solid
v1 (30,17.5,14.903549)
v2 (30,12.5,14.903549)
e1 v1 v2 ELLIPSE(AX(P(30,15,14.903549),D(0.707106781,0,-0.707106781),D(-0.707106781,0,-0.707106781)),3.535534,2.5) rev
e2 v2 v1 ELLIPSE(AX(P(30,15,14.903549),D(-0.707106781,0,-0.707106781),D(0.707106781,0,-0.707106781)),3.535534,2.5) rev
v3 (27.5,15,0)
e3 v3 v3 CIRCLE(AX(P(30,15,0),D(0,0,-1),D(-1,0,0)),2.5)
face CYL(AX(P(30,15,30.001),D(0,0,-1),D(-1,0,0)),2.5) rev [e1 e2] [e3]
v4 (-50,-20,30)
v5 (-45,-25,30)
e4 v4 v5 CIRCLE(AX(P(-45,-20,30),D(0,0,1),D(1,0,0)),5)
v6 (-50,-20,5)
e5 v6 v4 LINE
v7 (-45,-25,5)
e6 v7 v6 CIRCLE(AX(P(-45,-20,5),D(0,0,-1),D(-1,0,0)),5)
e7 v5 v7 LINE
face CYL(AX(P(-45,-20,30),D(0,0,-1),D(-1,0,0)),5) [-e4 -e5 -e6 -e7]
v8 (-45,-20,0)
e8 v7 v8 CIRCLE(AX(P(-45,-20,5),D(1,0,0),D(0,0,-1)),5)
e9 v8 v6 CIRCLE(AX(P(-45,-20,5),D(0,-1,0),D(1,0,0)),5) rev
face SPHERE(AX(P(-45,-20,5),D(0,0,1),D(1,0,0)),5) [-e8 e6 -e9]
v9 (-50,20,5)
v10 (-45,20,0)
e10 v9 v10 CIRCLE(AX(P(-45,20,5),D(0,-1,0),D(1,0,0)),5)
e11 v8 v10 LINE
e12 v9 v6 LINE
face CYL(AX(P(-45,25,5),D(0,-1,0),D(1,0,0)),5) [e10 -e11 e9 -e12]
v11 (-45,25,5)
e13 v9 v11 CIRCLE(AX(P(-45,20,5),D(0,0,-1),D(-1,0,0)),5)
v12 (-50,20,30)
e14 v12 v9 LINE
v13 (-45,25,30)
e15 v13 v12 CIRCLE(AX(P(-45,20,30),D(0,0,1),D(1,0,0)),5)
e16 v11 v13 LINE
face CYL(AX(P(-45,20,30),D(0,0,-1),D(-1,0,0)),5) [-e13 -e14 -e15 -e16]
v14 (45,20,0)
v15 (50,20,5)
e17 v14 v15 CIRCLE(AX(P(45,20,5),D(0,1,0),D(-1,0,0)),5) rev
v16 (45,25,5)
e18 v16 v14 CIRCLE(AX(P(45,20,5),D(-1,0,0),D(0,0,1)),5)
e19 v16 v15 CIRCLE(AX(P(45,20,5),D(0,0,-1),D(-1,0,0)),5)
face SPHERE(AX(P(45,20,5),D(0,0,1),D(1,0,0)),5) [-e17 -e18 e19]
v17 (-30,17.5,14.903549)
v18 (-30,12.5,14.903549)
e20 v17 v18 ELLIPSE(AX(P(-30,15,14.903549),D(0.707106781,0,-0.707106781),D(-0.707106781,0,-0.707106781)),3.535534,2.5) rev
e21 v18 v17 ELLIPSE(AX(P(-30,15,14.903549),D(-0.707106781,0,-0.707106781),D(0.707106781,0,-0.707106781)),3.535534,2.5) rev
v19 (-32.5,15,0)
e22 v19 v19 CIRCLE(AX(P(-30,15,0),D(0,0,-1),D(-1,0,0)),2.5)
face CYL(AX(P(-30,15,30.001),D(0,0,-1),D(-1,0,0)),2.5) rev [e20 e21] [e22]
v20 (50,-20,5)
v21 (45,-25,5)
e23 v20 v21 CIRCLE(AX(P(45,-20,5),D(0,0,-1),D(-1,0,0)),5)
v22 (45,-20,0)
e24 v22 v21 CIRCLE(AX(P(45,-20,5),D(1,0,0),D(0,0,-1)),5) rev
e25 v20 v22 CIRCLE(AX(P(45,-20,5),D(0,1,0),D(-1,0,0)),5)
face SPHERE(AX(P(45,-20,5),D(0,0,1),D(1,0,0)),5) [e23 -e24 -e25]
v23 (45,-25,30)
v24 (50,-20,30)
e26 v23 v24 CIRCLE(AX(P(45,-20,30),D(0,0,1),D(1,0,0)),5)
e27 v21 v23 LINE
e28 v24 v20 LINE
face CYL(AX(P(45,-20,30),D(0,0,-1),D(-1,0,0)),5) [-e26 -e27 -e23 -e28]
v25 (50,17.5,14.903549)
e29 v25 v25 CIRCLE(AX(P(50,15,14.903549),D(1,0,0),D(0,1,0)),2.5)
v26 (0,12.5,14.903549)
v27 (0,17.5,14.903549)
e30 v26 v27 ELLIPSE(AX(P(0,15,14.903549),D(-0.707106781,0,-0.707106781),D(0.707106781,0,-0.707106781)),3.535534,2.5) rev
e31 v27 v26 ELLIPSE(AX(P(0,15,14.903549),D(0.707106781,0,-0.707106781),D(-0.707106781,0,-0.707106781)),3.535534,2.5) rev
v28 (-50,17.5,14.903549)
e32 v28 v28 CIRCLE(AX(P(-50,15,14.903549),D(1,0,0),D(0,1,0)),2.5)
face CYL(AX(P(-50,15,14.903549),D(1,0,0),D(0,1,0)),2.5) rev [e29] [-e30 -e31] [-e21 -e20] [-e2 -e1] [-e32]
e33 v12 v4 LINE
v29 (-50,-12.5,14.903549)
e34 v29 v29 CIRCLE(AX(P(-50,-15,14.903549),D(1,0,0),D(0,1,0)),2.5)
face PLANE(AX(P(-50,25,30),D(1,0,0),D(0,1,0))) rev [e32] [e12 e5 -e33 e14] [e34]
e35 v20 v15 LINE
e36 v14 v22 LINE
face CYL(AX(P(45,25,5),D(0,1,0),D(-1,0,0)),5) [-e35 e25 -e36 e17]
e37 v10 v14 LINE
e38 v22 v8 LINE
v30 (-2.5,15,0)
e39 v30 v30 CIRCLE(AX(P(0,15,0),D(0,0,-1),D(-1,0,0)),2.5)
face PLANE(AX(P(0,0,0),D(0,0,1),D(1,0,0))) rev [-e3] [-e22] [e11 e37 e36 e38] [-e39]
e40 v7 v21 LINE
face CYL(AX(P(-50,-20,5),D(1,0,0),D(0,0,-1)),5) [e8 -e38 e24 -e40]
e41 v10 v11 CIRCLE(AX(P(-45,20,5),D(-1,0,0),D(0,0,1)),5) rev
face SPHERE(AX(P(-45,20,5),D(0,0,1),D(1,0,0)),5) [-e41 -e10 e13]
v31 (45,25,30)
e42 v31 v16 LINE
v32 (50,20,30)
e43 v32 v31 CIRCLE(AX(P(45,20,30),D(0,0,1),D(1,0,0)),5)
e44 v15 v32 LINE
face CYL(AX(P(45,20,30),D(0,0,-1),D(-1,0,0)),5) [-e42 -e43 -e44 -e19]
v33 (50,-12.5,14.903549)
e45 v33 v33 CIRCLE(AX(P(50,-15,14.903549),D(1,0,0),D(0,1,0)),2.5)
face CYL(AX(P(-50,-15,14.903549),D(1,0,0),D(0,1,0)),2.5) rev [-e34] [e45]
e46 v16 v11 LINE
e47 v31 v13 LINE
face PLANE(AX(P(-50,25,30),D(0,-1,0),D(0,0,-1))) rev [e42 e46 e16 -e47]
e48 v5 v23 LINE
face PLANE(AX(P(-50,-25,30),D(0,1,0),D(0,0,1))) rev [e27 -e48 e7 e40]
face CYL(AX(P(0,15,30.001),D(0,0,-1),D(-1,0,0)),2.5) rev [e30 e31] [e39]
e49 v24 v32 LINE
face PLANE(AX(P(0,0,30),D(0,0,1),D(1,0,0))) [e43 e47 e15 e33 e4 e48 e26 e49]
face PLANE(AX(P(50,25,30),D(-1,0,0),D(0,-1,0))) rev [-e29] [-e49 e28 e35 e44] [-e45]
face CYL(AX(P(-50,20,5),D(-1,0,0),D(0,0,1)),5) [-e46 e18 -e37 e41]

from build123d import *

# Parameters (mm, degrees)
SKETCH1_W               = 100
SKETCH1_H               = 50
BOSS_EXTRUDE1_DEPTH     = 30
SKETCH2_R               = 2.5
CUT_EXTRUDE1_DEPTH      = 108.354552768
FILLET1_R               = 5
CUT_EXTRUDE2_REACH      = 65.443
CUT_EXTRUDE2_END_RADIUS = 2.5
SKETCH3_R               = 2.5
FILLET2_R               = 5


with BuildPart() as part:
    # Sketch1 → Boss-Extrude1 (new body)
    with BuildSketch(Plane.XY):
        Rectangle(SKETCH1_W, SKETCH1_H)
    extrude(amount=BOSS_EXTRUDE1_DEPTH)

    # Sketch2 → Cut-Extrude1 (cut, through all)
    with BuildSketch(Plane(origin=(50, 0, 0), x_dir=(0, 0, -1), z_dir=(1, 0, 0))):
        with Locations(Location((-14.903548917, 15, 0), (0, 0, 90))):
            Circle(SKETCH2_R)
        with Locations(Location((-14.903548917, -15, 0), (0, 0, 90))):
            Circle(SKETCH2_R)
    extrude(amount=-CUT_EXTRUDE1_DEPTH, mode=Mode.SUBTRACT)

    # Fillet1
    fillet1_edges = [part.edges().sort_by_distance(p)[0] for p in [
        (0, -25, 0),
        (-50, 0, 0),
        (0, 25, 0),
        (50, 0, 0),
    ]]
    fillet(fillet1_edges, radius=FILLET1_R)

    # Cut-Extrude2: up to this cylinder (the profile starts outside it)
    cut_extrude2_end = Plane(origin=(0, 15, 14.903548917), z_dir=(1, 0, 0)) * Cylinder(CUT_EXTRUDE2_END_RADIUS, 196.886, mode=Mode.PRIVATE)
    # Sketch3 → Cut-Extrude2 (cut, up to the surface)
    with BuildSketch(Plane(origin=(0, 0, 0), x_dir=(-1, 0, 0), z_dir=(0, 0, -1)), mode=Mode.PRIVATE) as cut_extrude2_sk1:
        with Locations((-30, 15)):
            Circle(SKETCH3_R)
    cut_extrude2_tool1 = extrude(cut_extrude2_sk1.sketch, amount=-CUT_EXTRUDE2_REACH, mode=Mode.PRIVATE) - cut_extrude2_end
    add(cut_extrude2_tool1.solids().sort_by_distance((30, 15, 0))[0], mode=Mode.SUBTRACT)
    # Sketch3 → Cut-Extrude2 (cut, up to the surface)
    with BuildSketch(Plane(origin=(0, 0, 0), x_dir=(-1, 0, 0), z_dir=(0, 0, -1)), mode=Mode.PRIVATE) as cut_extrude2_sk2:
        with Locations((30, 15)):
            Circle(SKETCH3_R)
    cut_extrude2_tool2 = extrude(cut_extrude2_sk2.sketch, amount=-CUT_EXTRUDE2_REACH, mode=Mode.PRIVATE) - cut_extrude2_end
    add(cut_extrude2_tool2.solids().sort_by_distance((-30, 15, 0))[0], mode=Mode.SUBTRACT)
    # Sketch3 → Cut-Extrude2 (cut, up to the surface)
    with BuildSketch(Plane(origin=(0, 0, 0), x_dir=(-1, 0, 0), z_dir=(0, 0, -1)), mode=Mode.PRIVATE) as cut_extrude2_sk3:
        with Locations((0, 15)):
            Circle(SKETCH3_R)
    cut_extrude2_tool3 = extrude(cut_extrude2_sk3.sketch, amount=-CUT_EXTRUDE2_REACH, mode=Mode.PRIVATE) - cut_extrude2_end
    add(cut_extrude2_tool3.solids().sort_by_distance((0, 15, 0))[0], mode=Mode.SUBTRACT)

    # Fillet2
    # the kernel refuses this fillet: 5 mm, written as the material it takes off along each edge
    with BuildSketch(Plane(origin=(-45, -20, 5), x_dir=(0, -1, 0), z_dir=(-1, 0, 0))) as fillet2_piece_1_section:
        Polygon((0, 0), (FILLET2_R, 0), (FILLET2_R, -FILLET2_R), (0, -FILLET2_R), align=None)
    fillet2_piece_1 = extrude(amount=FILLET2_R, mode=Mode.PRIVATE)
    fillet2_piece_1 = fillet2_piece_1 - Plane(origin=(-45, -20, 5), x_dir=(0, 0.7071067811865475, 0.7071067811865475), z_dir=(-1, 0, 0)) * Sphere(FILLET2_R, mode=Mode.PRIVATE)
    add(fillet2_piece_1, mode=Mode.SUBTRACT)
    with BuildSketch(Plane(origin=(-45, 20, 5), x_dir=(-1, 0, 0), z_dir=(0, 1, 0))) as fillet2_piece_2_section:
        Polygon((0, 0), (FILLET2_R, 0), (FILLET2_R, -FILLET2_R), (0, -FILLET2_R), align=None)
    fillet2_piece_2 = extrude(amount=FILLET2_R, mode=Mode.PRIVATE)
    fillet2_piece_2 = fillet2_piece_2 - Plane(origin=(-45, 20, 5), x_dir=(0.7071067811865475, 0, 0.7071067811865475), z_dir=(0, 1, 0)) * Sphere(FILLET2_R, mode=Mode.PRIVATE)
    add(fillet2_piece_2, mode=Mode.SUBTRACT)
    with BuildSketch(Plane(origin=(45, -20, 5), x_dir=(0, -1, 0), z_dir=(1, 0, 0))) as fillet2_piece_3_section:
        Polygon((0, 0), (FILLET2_R, 0), (FILLET2_R, FILLET2_R), (0, FILLET2_R), align=None)
    fillet2_piece_3 = extrude(amount=FILLET2_R, mode=Mode.PRIVATE)
    fillet2_piece_3 = fillet2_piece_3 - Plane(origin=(45, -20, 5), x_dir=(0, 0.7071067811865475, 0.7071067811865475), z_dir=(1, 0, 0)) * Sphere(FILLET2_R, mode=Mode.PRIVATE)
    add(fillet2_piece_3, mode=Mode.SUBTRACT)
    with BuildSketch(Plane(origin=(45, 20, 5), x_dir=(1, 0, 0), z_dir=(0, 1, 0))) as fillet2_piece_4_section:
        Polygon((0, 0), (FILLET2_R, 0), (FILLET2_R, FILLET2_R), (0, FILLET2_R), align=None)
    fillet2_piece_4 = extrude(amount=FILLET2_R, mode=Mode.PRIVATE)
    fillet2_piece_4 = fillet2_piece_4 - Plane(origin=(45, 20, 5), x_dir=(-0.7071067811865475, 0, 0.7071067811865475), z_dir=(0, 1, 0)) * Sphere(FILLET2_R, mode=Mode.PRIVATE)
    add(fillet2_piece_4, mode=Mode.SUBTRACT)
    with BuildSketch(Plane(origin=(50, -25, 5), x_dir=(0, 1, 0), z_dir=(0, 0, 1)), Plane(origin=(50, 25, 5), x_dir=(-1, 0, 0), z_dir=(0, 0, 1))) as fillet2_piece_5:
        with BuildLine():
            CenterArc((FILLET2_R, FILLET2_R), FILLET2_R, 180, 90)
            Line((0, FILLET2_R), (0, 0))
            Line((0, 0), (FILLET2_R, 0))
        make_face()
    extrude(amount=37.5, mode=Mode.SUBTRACT)
    with BuildSketch(Plane(origin=(-50, -25, 5), x_dir=(0, 1, 0), z_dir=(0, 0, 1)), Plane(origin=(-50, 25, 5), x_dir=(1, 0, 0), z_dir=(0, 0, 1))) as fillet2_piece_6:
        with BuildLine():
            CenterArc((FILLET2_R, -FILLET2_R), FILLET2_R, 90, 90)
            Line((0, -FILLET2_R), (0, 0))
            Line((0, 0), (FILLET2_R, 0))
        make_face()
    extrude(amount=37.5, mode=Mode.SUBTRACT)


solid = part.part
